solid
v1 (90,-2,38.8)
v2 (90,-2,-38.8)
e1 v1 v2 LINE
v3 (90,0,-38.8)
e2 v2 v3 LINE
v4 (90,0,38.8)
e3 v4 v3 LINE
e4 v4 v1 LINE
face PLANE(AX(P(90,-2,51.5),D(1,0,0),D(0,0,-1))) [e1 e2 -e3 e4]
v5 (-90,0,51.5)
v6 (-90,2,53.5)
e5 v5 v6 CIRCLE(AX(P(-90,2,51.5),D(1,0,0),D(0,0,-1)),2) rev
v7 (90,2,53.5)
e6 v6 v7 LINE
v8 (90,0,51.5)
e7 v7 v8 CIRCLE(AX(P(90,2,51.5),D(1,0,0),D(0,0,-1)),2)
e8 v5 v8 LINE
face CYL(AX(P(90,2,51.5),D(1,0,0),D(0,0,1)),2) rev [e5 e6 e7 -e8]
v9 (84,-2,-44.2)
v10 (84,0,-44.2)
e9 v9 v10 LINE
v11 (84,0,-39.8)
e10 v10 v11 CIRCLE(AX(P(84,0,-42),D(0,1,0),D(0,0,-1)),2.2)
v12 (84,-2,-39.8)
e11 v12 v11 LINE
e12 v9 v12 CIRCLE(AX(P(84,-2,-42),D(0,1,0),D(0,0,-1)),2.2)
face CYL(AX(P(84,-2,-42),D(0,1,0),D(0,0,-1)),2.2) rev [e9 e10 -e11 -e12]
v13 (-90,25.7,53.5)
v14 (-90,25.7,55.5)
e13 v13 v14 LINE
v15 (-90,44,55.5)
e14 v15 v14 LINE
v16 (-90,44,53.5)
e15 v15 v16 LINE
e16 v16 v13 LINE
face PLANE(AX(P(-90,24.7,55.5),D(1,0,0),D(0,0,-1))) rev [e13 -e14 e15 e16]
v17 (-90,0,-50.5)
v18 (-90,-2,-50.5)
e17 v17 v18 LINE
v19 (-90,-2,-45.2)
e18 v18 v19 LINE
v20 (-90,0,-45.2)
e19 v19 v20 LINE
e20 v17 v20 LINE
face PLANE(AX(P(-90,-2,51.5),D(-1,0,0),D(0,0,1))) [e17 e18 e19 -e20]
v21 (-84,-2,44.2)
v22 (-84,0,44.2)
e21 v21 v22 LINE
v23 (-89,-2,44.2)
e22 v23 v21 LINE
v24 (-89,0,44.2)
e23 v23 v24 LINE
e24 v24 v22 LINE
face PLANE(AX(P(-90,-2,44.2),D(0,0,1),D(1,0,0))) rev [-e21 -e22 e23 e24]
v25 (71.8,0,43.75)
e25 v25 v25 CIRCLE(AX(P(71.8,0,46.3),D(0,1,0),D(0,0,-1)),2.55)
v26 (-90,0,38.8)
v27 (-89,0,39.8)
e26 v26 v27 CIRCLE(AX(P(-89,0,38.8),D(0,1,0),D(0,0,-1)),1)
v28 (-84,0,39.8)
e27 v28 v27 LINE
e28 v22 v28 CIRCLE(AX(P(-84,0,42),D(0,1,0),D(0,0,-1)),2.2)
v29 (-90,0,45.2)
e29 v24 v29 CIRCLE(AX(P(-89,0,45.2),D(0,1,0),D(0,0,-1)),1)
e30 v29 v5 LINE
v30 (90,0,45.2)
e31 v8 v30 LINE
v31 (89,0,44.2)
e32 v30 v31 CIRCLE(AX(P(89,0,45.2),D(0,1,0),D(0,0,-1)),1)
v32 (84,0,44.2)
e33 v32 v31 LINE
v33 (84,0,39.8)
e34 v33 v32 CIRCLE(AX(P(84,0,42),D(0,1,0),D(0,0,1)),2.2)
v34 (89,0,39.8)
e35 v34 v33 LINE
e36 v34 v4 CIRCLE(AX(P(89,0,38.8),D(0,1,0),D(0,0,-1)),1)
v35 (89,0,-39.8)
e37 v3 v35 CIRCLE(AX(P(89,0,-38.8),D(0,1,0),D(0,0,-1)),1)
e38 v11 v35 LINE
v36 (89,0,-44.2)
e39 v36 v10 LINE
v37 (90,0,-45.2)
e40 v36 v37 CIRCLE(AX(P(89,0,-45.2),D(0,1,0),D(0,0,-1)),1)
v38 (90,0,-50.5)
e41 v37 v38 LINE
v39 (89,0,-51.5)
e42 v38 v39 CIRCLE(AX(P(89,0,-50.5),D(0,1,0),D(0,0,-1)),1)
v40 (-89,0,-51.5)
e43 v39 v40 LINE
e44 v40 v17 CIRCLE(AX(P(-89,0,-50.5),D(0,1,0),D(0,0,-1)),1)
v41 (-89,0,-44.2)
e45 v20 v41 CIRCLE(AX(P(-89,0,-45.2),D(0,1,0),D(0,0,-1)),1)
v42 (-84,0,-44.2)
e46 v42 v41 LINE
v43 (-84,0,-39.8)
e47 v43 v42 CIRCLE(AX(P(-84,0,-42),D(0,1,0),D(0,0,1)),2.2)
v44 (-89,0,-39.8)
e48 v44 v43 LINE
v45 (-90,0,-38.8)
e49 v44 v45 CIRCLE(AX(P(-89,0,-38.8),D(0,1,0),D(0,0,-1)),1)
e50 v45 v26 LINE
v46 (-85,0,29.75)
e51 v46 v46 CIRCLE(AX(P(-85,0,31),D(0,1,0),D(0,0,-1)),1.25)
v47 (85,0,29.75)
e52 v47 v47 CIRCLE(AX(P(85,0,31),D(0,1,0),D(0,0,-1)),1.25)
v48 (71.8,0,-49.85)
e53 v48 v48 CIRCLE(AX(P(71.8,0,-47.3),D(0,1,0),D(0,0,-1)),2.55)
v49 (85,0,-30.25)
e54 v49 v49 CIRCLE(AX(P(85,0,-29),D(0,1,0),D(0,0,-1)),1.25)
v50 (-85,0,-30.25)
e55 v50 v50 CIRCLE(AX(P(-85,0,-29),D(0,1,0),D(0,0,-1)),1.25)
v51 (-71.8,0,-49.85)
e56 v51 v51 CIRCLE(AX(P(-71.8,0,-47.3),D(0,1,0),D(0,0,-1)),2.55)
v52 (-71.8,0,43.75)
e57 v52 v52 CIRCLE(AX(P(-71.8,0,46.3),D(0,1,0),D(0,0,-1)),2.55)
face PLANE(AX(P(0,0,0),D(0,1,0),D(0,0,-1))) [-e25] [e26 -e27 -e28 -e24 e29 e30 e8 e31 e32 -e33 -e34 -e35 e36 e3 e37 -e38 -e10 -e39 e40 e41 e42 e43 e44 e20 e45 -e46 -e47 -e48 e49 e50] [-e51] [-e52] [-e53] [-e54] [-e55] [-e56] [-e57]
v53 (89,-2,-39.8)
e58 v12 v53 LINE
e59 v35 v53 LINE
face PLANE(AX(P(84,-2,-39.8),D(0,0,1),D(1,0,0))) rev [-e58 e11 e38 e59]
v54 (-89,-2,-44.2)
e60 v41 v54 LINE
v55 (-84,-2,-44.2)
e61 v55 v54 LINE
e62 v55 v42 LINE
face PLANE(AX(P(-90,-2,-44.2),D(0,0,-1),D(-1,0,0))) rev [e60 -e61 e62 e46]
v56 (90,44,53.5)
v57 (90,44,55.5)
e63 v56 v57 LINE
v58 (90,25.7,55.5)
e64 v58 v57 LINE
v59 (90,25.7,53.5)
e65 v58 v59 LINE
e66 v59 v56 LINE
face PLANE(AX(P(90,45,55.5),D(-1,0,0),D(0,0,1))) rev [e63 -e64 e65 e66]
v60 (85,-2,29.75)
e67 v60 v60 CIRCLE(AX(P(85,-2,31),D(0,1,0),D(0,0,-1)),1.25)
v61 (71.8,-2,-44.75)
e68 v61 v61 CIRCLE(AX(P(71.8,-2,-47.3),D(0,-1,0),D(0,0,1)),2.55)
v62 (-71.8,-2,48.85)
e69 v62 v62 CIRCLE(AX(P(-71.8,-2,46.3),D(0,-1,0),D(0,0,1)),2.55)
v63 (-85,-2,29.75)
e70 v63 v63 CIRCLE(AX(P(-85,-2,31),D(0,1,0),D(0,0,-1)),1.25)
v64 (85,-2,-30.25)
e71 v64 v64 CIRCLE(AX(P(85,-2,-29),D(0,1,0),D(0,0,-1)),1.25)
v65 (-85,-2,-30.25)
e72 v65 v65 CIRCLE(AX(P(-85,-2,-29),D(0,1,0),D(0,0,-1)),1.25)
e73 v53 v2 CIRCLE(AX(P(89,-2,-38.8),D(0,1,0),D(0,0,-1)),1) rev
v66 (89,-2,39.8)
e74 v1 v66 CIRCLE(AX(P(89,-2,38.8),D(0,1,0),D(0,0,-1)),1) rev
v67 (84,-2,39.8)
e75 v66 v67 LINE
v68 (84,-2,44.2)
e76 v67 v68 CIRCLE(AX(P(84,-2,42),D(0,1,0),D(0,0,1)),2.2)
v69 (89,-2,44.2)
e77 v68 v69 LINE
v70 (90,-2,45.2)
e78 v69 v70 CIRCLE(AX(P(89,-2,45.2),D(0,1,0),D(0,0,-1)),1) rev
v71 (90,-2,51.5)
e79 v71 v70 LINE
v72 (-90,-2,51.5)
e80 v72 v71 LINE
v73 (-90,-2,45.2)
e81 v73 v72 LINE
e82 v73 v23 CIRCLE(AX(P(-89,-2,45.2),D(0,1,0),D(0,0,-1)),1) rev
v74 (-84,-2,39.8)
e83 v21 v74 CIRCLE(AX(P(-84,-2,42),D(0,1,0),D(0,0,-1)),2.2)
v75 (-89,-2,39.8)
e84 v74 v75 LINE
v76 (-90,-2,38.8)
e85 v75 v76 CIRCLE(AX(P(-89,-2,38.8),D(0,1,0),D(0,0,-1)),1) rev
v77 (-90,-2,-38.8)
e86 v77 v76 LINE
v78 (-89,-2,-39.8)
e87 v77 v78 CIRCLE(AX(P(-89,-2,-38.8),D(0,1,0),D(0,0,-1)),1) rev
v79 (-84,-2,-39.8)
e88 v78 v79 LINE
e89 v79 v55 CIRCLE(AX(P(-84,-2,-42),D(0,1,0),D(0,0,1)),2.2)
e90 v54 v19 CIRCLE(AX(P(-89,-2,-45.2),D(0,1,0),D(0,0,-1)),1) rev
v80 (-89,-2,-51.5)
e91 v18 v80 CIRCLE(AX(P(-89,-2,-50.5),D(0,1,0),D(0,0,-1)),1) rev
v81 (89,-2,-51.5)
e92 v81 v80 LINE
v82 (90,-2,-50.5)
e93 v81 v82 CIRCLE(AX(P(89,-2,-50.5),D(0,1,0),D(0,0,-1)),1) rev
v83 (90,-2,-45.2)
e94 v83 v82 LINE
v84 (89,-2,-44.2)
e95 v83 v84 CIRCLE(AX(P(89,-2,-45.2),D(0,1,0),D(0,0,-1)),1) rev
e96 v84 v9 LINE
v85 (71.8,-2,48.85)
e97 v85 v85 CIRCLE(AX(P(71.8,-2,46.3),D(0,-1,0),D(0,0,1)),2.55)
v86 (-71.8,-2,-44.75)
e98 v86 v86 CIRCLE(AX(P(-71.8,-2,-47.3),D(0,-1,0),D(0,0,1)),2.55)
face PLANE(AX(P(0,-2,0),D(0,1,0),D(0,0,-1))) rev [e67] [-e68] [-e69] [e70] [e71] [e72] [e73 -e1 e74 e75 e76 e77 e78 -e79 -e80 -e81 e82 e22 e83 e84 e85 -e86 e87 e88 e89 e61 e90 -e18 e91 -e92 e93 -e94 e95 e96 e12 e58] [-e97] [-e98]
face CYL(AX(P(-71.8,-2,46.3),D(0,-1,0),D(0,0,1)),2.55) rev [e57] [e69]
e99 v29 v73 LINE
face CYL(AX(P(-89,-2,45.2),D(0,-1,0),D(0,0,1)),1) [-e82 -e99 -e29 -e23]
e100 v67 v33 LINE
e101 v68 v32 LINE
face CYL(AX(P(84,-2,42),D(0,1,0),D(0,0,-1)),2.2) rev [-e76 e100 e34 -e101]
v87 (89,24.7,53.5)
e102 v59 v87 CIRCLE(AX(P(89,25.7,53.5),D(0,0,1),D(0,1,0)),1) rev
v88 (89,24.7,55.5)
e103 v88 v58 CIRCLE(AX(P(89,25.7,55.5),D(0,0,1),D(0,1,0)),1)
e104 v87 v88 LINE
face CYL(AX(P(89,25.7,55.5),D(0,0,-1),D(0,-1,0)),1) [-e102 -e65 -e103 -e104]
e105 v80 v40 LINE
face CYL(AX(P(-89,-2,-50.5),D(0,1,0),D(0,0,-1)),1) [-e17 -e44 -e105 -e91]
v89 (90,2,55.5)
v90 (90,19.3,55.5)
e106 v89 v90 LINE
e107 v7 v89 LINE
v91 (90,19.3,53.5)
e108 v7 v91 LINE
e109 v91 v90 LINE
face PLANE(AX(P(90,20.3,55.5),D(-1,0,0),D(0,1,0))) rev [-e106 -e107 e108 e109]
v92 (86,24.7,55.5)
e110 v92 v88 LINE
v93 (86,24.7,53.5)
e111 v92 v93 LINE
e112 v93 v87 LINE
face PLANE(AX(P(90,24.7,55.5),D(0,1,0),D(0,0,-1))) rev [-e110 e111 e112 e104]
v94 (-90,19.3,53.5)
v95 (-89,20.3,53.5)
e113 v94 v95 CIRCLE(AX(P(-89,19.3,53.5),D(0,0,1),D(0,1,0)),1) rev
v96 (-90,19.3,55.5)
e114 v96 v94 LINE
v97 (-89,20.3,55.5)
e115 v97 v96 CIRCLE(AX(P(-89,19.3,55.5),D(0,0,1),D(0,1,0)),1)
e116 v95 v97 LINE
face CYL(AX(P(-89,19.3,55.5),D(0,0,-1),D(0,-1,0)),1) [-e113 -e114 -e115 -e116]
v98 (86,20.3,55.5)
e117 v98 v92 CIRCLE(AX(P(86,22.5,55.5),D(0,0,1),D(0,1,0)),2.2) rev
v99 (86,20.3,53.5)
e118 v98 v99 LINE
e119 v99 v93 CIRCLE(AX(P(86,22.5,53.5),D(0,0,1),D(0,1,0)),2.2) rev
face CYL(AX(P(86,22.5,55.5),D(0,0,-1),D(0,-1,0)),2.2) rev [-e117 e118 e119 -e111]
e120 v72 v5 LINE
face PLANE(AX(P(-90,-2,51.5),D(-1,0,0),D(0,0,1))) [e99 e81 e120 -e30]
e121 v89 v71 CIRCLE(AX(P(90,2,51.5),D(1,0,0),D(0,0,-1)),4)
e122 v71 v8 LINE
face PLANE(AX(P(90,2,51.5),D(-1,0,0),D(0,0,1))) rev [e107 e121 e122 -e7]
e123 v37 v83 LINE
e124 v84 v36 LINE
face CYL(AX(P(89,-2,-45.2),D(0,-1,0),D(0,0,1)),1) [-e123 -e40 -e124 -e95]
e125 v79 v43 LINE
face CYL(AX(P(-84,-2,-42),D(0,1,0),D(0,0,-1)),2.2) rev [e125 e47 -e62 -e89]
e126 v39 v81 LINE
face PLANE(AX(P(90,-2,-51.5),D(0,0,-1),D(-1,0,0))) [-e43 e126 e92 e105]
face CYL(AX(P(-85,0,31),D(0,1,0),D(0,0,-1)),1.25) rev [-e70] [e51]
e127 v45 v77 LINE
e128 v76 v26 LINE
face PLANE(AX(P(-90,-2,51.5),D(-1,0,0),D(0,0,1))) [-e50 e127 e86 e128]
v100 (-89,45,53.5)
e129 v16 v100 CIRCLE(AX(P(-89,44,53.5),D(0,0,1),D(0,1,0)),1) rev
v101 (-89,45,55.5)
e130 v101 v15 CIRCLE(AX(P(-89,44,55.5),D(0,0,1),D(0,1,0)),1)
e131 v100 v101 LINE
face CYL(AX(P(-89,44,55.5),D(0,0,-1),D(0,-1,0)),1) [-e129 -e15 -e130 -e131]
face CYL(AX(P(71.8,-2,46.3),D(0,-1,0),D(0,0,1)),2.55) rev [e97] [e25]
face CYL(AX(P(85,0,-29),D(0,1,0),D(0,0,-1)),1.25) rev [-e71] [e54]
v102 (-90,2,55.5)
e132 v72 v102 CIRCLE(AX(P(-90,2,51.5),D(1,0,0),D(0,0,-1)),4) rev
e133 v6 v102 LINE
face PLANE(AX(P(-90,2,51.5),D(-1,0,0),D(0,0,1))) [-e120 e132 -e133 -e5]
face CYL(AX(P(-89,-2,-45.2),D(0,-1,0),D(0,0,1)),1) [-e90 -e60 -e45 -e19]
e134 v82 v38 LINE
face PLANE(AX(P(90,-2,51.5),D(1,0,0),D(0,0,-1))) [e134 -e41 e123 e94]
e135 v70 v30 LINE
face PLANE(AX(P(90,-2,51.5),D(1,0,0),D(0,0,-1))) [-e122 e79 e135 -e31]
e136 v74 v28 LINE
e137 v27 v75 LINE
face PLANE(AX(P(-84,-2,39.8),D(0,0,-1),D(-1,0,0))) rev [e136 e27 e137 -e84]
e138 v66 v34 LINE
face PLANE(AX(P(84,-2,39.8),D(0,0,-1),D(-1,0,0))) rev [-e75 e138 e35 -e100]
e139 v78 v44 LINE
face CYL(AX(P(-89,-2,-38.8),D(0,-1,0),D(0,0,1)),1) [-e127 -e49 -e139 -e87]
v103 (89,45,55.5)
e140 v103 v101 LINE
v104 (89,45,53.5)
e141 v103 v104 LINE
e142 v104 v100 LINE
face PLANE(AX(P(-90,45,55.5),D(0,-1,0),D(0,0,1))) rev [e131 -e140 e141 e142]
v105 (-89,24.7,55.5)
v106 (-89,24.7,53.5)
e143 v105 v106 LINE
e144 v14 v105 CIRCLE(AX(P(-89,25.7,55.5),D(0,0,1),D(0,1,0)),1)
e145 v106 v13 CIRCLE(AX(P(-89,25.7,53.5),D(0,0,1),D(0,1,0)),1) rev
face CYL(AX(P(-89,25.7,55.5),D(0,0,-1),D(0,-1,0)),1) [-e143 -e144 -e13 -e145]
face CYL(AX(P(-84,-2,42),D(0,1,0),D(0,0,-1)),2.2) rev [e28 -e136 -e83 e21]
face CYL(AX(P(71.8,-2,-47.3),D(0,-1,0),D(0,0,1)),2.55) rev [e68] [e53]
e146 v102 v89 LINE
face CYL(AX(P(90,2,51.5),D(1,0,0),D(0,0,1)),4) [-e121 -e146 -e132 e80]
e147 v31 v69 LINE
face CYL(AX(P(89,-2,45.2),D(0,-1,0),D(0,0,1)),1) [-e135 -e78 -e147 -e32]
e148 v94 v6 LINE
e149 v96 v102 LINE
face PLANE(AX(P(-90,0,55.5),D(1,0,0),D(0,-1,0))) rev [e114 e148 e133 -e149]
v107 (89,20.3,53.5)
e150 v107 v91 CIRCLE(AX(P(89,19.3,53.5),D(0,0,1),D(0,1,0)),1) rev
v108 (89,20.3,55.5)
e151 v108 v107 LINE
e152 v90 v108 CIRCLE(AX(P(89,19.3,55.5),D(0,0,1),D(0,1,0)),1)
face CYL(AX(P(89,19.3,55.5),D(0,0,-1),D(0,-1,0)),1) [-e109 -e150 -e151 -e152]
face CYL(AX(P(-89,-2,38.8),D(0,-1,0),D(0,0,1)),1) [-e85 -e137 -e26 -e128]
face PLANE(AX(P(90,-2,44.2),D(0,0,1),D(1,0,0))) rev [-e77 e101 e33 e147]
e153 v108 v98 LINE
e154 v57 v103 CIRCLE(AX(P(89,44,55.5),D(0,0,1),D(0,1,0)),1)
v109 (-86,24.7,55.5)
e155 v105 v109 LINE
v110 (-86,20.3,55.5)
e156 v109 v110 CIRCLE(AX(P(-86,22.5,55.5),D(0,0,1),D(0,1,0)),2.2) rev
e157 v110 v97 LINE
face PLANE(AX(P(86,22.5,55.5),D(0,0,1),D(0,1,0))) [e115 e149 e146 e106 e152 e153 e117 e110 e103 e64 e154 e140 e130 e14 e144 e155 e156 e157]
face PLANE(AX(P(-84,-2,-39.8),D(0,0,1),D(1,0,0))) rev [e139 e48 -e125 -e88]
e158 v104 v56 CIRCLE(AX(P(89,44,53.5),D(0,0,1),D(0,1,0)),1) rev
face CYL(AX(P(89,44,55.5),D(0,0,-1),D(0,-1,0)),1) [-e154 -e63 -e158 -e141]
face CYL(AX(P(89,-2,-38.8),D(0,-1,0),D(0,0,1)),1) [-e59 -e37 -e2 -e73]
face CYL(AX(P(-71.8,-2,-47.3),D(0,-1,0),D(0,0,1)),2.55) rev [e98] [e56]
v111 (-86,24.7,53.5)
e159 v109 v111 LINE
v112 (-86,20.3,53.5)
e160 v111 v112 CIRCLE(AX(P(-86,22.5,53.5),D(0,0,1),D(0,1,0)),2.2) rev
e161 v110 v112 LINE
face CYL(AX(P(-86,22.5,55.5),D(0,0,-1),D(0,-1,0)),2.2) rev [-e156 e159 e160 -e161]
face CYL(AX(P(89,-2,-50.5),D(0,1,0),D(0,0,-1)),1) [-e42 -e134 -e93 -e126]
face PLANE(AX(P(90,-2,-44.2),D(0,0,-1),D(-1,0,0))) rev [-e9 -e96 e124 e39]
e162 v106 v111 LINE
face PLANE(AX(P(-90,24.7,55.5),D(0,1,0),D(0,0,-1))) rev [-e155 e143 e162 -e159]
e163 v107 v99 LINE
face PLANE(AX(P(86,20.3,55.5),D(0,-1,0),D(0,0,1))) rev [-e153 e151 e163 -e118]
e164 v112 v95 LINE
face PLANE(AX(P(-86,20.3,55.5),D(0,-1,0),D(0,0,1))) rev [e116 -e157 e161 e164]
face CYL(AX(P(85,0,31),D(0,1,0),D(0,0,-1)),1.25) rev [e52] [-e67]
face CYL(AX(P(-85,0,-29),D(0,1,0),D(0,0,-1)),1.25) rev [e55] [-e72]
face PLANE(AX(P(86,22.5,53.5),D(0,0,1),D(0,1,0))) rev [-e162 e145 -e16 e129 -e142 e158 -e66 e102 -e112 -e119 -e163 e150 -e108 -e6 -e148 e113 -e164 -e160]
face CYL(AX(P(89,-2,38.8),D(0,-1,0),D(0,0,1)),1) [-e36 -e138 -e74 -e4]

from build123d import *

# Parameters (mm, degrees)
SKETCH1_W                  = 180
SKETCH1_H                  = 103
BASE_FLANGE1_DEPTH         = 2
EDGE_FLANGE1_DEPTH         = 180
EDGE_FLANGE1_START         = 2
EDGE_FLANGE1_FLAT_DEPTH    = 2
F_5_1_5_1_DIAMETER_HOLE1_D = 5.1
LPATTERN1_COUNT            = 2
LPATTERN1_PITCH            = 143.6
LPATTERN1_COUNT_DIR2       = 2
LPATTERN1_PITCH_DIR2       = 93.6
M3_TAPPED_HOLE1_D          = 2.5
CUT_EXTRUDE1_DEPTH         = 115.914098352
FILLET1_R                  = 1
BODY_MOVE_COPY1_ANGLE      = 180


# Sheet-metal steps are written as plain solids
with BuildPart() as part:
    # Sketch1 → Base-Flange1 (new body)
    with BuildSketch(Plane(origin=(0, 0, 0), x_dir=(1, 0, 0), z_dir=(0, 1, 0))):
        Rectangle(SKETCH1_W, SKETCH1_H)
    extrude(amount=-BASE_FLANGE1_DEPTH)

    # Edge-Flange1 bend section (across the edge) → Edge-Flange1 (add)
    with BuildSketch(Plane(origin=(90, 0, -53.5), x_dir=(0, 0, 1), z_dir=(-1, 0, 0))):
        with BuildLine():
            Line((-2, 2), (0, 2))
            ThreePointArc((0, 2), (0.585786438, 0.585786438), (2, 0))
            Line((2, 0), (2, -2))
            ThreePointArc((2, -2), (-0.828427125, -0.828427125), (-2, 2))
        make_face()
    extrude(amount=EDGE_FLANGE1_DEPTH)

    # Edge-Flange1 profile (on flange) → Edge-Flange1 flat (add)
    with BuildSketch(Plane(origin=(0, 0, -53.5), x_dir=(-1, 0, 0), z_dir=(0, 0, -1)).offset(EDGE_FLANGE1_START)):
        with BuildLine():
            ThreePointArc((86, 20.3), (83.8, 22.5), (86, 24.7))
            Line((86, 24.7), (90, 24.7))
            Line((90, 24.7), (90, 45))
            Line((90, 45), (-90, 45))
            Line((-90, 45), (-90, 24.7))
            Line((-90, 24.7), (-86, 24.7))
            ThreePointArc((-86, 24.7), (-83.8, 22.5), (-86, 20.3))
            Line((-86, 20.3), (-90, 20.3))
            Line((-90, 20.3), (-90, 2))
            Line((-90, 2), (90, 2))
            Line((90, 2), (90, 20.3))
            Line((90, 20.3), (86, 20.3))
        make_face()
    extrude(amount=-EDGE_FLANGE1_FLAT_DEPTH)

    # Ø5.1 (5.1) Diameter Hole1 (through all)
    with Locations(Plane(origin=(0, -2, 0), x_dir=(-1, 0, 0), z_dir=(0, -1, 0))):
        with Locations((-71.8, -47.3)):
            f_5_1_5_1_diameter_hole1 = Hole(F_5_1_5_1_DIAMETER_HOLE1_D / 2)

    # LPattern1: 5.1 _5.1_ Diameter Hole1 2 × 2
    with Locations(*[(-i * LPATTERN1_PITCH, 0, -j * LPATTERN1_PITCH_DIR2) for i in range(LPATTERN1_COUNT) for j in range(LPATTERN1_COUNT_DIR2) if (i, j) != (0, 0)]):
        add(f_5_1_5_1_diameter_hole1, mode=Mode.SUBTRACT)

    # M3 Tapped Hole1 (through all)
    with Locations(Plane(origin=(0, 0, 0), x_dir=(1, 0, 0), z_dir=(0, 1, 0))):
        with Locations((-85, -29), (85, -29), (-85, 31), (85, 31)):
            Hole(M3_TAPPED_HOLE1_D / 2)

    # Sketch13 → Cut-Extrude1 (cut, through all)
    with BuildSketch(Plane(origin=(0, 0, 0), x_dir=(1, 0, 0), z_dir=(0, 1, 0))):
        with BuildLine():
            Line((-90, 44.2), (-84, 44.2))
            ThreePointArc((-84, 44.2), (-81.8, 42), (-84, 39.8))
            Line((-84, 39.8), (-90, 39.8))
            Line((-90, 39.8), (-90, 44.2))
        make_face()
        with BuildLine():
            Line((-90, -39.8), (-90, -44.2))
            Line((-90, -44.2), (-84, -44.2))
            ThreePointArc((-84, -44.2), (-81.8, -42), (-84, -39.8))
            Line((-84, -39.8), (-90, -39.8))
        make_face()
        with BuildLine():
            Line((90, -44.2), (84, -44.2))
            ThreePointArc((84, -44.2), (81.8, -42), (84, -39.8))
            Line((84, -39.8), (90, -39.8))
            Line((90, -39.8), (90, -44.2))
        make_face()
        with BuildLine():
            Line((90, 39.8), (90, 44.2))
            Line((90, 44.2), (84, 44.2))
            ThreePointArc((84, 44.2), (81.8, 42), (84, 39.8))
            Line((84, 39.8), (90, 39.8))
        make_face()
    extrude(amount=-CUT_EXTRUDE1_DEPTH, mode=Mode.SUBTRACT)

    # Fillet1
    fillet1_edges = [part.edges().sort_by_distance(p)[0] for p in [
        (90, -1, -44.2),
        (90, -1, -39.8),
        (90, -1, 39.8),
        (90, -1, 44.2),
        (-90, -1, 44.2),
        (-90, -1, 39.8),
        (-90, -1, -39.8),
        (-90, -1, -44.2),
        (90, 20.3, -54.5),
        (-90, 20.3, -54.5),
        (-90, 24.7, -54.5),
        (-90, 45, -54.5),
        (90, 45, -54.5),
        (90, 24.7, -54.5),
        (90, -1, 51.5),
        (-90, -1, 51.5),
    ]]
    fillet(fillet1_edges, radius=FILLET1_R)


with BuildPart() as part_1:
    # Body-Move/Copy1: moved
    add(part.part.rotate(Axis((0, 0, 0), (0, 1, 0)), BODY_MOVE_COPY1_ANGLE))


solid = part_1.part
